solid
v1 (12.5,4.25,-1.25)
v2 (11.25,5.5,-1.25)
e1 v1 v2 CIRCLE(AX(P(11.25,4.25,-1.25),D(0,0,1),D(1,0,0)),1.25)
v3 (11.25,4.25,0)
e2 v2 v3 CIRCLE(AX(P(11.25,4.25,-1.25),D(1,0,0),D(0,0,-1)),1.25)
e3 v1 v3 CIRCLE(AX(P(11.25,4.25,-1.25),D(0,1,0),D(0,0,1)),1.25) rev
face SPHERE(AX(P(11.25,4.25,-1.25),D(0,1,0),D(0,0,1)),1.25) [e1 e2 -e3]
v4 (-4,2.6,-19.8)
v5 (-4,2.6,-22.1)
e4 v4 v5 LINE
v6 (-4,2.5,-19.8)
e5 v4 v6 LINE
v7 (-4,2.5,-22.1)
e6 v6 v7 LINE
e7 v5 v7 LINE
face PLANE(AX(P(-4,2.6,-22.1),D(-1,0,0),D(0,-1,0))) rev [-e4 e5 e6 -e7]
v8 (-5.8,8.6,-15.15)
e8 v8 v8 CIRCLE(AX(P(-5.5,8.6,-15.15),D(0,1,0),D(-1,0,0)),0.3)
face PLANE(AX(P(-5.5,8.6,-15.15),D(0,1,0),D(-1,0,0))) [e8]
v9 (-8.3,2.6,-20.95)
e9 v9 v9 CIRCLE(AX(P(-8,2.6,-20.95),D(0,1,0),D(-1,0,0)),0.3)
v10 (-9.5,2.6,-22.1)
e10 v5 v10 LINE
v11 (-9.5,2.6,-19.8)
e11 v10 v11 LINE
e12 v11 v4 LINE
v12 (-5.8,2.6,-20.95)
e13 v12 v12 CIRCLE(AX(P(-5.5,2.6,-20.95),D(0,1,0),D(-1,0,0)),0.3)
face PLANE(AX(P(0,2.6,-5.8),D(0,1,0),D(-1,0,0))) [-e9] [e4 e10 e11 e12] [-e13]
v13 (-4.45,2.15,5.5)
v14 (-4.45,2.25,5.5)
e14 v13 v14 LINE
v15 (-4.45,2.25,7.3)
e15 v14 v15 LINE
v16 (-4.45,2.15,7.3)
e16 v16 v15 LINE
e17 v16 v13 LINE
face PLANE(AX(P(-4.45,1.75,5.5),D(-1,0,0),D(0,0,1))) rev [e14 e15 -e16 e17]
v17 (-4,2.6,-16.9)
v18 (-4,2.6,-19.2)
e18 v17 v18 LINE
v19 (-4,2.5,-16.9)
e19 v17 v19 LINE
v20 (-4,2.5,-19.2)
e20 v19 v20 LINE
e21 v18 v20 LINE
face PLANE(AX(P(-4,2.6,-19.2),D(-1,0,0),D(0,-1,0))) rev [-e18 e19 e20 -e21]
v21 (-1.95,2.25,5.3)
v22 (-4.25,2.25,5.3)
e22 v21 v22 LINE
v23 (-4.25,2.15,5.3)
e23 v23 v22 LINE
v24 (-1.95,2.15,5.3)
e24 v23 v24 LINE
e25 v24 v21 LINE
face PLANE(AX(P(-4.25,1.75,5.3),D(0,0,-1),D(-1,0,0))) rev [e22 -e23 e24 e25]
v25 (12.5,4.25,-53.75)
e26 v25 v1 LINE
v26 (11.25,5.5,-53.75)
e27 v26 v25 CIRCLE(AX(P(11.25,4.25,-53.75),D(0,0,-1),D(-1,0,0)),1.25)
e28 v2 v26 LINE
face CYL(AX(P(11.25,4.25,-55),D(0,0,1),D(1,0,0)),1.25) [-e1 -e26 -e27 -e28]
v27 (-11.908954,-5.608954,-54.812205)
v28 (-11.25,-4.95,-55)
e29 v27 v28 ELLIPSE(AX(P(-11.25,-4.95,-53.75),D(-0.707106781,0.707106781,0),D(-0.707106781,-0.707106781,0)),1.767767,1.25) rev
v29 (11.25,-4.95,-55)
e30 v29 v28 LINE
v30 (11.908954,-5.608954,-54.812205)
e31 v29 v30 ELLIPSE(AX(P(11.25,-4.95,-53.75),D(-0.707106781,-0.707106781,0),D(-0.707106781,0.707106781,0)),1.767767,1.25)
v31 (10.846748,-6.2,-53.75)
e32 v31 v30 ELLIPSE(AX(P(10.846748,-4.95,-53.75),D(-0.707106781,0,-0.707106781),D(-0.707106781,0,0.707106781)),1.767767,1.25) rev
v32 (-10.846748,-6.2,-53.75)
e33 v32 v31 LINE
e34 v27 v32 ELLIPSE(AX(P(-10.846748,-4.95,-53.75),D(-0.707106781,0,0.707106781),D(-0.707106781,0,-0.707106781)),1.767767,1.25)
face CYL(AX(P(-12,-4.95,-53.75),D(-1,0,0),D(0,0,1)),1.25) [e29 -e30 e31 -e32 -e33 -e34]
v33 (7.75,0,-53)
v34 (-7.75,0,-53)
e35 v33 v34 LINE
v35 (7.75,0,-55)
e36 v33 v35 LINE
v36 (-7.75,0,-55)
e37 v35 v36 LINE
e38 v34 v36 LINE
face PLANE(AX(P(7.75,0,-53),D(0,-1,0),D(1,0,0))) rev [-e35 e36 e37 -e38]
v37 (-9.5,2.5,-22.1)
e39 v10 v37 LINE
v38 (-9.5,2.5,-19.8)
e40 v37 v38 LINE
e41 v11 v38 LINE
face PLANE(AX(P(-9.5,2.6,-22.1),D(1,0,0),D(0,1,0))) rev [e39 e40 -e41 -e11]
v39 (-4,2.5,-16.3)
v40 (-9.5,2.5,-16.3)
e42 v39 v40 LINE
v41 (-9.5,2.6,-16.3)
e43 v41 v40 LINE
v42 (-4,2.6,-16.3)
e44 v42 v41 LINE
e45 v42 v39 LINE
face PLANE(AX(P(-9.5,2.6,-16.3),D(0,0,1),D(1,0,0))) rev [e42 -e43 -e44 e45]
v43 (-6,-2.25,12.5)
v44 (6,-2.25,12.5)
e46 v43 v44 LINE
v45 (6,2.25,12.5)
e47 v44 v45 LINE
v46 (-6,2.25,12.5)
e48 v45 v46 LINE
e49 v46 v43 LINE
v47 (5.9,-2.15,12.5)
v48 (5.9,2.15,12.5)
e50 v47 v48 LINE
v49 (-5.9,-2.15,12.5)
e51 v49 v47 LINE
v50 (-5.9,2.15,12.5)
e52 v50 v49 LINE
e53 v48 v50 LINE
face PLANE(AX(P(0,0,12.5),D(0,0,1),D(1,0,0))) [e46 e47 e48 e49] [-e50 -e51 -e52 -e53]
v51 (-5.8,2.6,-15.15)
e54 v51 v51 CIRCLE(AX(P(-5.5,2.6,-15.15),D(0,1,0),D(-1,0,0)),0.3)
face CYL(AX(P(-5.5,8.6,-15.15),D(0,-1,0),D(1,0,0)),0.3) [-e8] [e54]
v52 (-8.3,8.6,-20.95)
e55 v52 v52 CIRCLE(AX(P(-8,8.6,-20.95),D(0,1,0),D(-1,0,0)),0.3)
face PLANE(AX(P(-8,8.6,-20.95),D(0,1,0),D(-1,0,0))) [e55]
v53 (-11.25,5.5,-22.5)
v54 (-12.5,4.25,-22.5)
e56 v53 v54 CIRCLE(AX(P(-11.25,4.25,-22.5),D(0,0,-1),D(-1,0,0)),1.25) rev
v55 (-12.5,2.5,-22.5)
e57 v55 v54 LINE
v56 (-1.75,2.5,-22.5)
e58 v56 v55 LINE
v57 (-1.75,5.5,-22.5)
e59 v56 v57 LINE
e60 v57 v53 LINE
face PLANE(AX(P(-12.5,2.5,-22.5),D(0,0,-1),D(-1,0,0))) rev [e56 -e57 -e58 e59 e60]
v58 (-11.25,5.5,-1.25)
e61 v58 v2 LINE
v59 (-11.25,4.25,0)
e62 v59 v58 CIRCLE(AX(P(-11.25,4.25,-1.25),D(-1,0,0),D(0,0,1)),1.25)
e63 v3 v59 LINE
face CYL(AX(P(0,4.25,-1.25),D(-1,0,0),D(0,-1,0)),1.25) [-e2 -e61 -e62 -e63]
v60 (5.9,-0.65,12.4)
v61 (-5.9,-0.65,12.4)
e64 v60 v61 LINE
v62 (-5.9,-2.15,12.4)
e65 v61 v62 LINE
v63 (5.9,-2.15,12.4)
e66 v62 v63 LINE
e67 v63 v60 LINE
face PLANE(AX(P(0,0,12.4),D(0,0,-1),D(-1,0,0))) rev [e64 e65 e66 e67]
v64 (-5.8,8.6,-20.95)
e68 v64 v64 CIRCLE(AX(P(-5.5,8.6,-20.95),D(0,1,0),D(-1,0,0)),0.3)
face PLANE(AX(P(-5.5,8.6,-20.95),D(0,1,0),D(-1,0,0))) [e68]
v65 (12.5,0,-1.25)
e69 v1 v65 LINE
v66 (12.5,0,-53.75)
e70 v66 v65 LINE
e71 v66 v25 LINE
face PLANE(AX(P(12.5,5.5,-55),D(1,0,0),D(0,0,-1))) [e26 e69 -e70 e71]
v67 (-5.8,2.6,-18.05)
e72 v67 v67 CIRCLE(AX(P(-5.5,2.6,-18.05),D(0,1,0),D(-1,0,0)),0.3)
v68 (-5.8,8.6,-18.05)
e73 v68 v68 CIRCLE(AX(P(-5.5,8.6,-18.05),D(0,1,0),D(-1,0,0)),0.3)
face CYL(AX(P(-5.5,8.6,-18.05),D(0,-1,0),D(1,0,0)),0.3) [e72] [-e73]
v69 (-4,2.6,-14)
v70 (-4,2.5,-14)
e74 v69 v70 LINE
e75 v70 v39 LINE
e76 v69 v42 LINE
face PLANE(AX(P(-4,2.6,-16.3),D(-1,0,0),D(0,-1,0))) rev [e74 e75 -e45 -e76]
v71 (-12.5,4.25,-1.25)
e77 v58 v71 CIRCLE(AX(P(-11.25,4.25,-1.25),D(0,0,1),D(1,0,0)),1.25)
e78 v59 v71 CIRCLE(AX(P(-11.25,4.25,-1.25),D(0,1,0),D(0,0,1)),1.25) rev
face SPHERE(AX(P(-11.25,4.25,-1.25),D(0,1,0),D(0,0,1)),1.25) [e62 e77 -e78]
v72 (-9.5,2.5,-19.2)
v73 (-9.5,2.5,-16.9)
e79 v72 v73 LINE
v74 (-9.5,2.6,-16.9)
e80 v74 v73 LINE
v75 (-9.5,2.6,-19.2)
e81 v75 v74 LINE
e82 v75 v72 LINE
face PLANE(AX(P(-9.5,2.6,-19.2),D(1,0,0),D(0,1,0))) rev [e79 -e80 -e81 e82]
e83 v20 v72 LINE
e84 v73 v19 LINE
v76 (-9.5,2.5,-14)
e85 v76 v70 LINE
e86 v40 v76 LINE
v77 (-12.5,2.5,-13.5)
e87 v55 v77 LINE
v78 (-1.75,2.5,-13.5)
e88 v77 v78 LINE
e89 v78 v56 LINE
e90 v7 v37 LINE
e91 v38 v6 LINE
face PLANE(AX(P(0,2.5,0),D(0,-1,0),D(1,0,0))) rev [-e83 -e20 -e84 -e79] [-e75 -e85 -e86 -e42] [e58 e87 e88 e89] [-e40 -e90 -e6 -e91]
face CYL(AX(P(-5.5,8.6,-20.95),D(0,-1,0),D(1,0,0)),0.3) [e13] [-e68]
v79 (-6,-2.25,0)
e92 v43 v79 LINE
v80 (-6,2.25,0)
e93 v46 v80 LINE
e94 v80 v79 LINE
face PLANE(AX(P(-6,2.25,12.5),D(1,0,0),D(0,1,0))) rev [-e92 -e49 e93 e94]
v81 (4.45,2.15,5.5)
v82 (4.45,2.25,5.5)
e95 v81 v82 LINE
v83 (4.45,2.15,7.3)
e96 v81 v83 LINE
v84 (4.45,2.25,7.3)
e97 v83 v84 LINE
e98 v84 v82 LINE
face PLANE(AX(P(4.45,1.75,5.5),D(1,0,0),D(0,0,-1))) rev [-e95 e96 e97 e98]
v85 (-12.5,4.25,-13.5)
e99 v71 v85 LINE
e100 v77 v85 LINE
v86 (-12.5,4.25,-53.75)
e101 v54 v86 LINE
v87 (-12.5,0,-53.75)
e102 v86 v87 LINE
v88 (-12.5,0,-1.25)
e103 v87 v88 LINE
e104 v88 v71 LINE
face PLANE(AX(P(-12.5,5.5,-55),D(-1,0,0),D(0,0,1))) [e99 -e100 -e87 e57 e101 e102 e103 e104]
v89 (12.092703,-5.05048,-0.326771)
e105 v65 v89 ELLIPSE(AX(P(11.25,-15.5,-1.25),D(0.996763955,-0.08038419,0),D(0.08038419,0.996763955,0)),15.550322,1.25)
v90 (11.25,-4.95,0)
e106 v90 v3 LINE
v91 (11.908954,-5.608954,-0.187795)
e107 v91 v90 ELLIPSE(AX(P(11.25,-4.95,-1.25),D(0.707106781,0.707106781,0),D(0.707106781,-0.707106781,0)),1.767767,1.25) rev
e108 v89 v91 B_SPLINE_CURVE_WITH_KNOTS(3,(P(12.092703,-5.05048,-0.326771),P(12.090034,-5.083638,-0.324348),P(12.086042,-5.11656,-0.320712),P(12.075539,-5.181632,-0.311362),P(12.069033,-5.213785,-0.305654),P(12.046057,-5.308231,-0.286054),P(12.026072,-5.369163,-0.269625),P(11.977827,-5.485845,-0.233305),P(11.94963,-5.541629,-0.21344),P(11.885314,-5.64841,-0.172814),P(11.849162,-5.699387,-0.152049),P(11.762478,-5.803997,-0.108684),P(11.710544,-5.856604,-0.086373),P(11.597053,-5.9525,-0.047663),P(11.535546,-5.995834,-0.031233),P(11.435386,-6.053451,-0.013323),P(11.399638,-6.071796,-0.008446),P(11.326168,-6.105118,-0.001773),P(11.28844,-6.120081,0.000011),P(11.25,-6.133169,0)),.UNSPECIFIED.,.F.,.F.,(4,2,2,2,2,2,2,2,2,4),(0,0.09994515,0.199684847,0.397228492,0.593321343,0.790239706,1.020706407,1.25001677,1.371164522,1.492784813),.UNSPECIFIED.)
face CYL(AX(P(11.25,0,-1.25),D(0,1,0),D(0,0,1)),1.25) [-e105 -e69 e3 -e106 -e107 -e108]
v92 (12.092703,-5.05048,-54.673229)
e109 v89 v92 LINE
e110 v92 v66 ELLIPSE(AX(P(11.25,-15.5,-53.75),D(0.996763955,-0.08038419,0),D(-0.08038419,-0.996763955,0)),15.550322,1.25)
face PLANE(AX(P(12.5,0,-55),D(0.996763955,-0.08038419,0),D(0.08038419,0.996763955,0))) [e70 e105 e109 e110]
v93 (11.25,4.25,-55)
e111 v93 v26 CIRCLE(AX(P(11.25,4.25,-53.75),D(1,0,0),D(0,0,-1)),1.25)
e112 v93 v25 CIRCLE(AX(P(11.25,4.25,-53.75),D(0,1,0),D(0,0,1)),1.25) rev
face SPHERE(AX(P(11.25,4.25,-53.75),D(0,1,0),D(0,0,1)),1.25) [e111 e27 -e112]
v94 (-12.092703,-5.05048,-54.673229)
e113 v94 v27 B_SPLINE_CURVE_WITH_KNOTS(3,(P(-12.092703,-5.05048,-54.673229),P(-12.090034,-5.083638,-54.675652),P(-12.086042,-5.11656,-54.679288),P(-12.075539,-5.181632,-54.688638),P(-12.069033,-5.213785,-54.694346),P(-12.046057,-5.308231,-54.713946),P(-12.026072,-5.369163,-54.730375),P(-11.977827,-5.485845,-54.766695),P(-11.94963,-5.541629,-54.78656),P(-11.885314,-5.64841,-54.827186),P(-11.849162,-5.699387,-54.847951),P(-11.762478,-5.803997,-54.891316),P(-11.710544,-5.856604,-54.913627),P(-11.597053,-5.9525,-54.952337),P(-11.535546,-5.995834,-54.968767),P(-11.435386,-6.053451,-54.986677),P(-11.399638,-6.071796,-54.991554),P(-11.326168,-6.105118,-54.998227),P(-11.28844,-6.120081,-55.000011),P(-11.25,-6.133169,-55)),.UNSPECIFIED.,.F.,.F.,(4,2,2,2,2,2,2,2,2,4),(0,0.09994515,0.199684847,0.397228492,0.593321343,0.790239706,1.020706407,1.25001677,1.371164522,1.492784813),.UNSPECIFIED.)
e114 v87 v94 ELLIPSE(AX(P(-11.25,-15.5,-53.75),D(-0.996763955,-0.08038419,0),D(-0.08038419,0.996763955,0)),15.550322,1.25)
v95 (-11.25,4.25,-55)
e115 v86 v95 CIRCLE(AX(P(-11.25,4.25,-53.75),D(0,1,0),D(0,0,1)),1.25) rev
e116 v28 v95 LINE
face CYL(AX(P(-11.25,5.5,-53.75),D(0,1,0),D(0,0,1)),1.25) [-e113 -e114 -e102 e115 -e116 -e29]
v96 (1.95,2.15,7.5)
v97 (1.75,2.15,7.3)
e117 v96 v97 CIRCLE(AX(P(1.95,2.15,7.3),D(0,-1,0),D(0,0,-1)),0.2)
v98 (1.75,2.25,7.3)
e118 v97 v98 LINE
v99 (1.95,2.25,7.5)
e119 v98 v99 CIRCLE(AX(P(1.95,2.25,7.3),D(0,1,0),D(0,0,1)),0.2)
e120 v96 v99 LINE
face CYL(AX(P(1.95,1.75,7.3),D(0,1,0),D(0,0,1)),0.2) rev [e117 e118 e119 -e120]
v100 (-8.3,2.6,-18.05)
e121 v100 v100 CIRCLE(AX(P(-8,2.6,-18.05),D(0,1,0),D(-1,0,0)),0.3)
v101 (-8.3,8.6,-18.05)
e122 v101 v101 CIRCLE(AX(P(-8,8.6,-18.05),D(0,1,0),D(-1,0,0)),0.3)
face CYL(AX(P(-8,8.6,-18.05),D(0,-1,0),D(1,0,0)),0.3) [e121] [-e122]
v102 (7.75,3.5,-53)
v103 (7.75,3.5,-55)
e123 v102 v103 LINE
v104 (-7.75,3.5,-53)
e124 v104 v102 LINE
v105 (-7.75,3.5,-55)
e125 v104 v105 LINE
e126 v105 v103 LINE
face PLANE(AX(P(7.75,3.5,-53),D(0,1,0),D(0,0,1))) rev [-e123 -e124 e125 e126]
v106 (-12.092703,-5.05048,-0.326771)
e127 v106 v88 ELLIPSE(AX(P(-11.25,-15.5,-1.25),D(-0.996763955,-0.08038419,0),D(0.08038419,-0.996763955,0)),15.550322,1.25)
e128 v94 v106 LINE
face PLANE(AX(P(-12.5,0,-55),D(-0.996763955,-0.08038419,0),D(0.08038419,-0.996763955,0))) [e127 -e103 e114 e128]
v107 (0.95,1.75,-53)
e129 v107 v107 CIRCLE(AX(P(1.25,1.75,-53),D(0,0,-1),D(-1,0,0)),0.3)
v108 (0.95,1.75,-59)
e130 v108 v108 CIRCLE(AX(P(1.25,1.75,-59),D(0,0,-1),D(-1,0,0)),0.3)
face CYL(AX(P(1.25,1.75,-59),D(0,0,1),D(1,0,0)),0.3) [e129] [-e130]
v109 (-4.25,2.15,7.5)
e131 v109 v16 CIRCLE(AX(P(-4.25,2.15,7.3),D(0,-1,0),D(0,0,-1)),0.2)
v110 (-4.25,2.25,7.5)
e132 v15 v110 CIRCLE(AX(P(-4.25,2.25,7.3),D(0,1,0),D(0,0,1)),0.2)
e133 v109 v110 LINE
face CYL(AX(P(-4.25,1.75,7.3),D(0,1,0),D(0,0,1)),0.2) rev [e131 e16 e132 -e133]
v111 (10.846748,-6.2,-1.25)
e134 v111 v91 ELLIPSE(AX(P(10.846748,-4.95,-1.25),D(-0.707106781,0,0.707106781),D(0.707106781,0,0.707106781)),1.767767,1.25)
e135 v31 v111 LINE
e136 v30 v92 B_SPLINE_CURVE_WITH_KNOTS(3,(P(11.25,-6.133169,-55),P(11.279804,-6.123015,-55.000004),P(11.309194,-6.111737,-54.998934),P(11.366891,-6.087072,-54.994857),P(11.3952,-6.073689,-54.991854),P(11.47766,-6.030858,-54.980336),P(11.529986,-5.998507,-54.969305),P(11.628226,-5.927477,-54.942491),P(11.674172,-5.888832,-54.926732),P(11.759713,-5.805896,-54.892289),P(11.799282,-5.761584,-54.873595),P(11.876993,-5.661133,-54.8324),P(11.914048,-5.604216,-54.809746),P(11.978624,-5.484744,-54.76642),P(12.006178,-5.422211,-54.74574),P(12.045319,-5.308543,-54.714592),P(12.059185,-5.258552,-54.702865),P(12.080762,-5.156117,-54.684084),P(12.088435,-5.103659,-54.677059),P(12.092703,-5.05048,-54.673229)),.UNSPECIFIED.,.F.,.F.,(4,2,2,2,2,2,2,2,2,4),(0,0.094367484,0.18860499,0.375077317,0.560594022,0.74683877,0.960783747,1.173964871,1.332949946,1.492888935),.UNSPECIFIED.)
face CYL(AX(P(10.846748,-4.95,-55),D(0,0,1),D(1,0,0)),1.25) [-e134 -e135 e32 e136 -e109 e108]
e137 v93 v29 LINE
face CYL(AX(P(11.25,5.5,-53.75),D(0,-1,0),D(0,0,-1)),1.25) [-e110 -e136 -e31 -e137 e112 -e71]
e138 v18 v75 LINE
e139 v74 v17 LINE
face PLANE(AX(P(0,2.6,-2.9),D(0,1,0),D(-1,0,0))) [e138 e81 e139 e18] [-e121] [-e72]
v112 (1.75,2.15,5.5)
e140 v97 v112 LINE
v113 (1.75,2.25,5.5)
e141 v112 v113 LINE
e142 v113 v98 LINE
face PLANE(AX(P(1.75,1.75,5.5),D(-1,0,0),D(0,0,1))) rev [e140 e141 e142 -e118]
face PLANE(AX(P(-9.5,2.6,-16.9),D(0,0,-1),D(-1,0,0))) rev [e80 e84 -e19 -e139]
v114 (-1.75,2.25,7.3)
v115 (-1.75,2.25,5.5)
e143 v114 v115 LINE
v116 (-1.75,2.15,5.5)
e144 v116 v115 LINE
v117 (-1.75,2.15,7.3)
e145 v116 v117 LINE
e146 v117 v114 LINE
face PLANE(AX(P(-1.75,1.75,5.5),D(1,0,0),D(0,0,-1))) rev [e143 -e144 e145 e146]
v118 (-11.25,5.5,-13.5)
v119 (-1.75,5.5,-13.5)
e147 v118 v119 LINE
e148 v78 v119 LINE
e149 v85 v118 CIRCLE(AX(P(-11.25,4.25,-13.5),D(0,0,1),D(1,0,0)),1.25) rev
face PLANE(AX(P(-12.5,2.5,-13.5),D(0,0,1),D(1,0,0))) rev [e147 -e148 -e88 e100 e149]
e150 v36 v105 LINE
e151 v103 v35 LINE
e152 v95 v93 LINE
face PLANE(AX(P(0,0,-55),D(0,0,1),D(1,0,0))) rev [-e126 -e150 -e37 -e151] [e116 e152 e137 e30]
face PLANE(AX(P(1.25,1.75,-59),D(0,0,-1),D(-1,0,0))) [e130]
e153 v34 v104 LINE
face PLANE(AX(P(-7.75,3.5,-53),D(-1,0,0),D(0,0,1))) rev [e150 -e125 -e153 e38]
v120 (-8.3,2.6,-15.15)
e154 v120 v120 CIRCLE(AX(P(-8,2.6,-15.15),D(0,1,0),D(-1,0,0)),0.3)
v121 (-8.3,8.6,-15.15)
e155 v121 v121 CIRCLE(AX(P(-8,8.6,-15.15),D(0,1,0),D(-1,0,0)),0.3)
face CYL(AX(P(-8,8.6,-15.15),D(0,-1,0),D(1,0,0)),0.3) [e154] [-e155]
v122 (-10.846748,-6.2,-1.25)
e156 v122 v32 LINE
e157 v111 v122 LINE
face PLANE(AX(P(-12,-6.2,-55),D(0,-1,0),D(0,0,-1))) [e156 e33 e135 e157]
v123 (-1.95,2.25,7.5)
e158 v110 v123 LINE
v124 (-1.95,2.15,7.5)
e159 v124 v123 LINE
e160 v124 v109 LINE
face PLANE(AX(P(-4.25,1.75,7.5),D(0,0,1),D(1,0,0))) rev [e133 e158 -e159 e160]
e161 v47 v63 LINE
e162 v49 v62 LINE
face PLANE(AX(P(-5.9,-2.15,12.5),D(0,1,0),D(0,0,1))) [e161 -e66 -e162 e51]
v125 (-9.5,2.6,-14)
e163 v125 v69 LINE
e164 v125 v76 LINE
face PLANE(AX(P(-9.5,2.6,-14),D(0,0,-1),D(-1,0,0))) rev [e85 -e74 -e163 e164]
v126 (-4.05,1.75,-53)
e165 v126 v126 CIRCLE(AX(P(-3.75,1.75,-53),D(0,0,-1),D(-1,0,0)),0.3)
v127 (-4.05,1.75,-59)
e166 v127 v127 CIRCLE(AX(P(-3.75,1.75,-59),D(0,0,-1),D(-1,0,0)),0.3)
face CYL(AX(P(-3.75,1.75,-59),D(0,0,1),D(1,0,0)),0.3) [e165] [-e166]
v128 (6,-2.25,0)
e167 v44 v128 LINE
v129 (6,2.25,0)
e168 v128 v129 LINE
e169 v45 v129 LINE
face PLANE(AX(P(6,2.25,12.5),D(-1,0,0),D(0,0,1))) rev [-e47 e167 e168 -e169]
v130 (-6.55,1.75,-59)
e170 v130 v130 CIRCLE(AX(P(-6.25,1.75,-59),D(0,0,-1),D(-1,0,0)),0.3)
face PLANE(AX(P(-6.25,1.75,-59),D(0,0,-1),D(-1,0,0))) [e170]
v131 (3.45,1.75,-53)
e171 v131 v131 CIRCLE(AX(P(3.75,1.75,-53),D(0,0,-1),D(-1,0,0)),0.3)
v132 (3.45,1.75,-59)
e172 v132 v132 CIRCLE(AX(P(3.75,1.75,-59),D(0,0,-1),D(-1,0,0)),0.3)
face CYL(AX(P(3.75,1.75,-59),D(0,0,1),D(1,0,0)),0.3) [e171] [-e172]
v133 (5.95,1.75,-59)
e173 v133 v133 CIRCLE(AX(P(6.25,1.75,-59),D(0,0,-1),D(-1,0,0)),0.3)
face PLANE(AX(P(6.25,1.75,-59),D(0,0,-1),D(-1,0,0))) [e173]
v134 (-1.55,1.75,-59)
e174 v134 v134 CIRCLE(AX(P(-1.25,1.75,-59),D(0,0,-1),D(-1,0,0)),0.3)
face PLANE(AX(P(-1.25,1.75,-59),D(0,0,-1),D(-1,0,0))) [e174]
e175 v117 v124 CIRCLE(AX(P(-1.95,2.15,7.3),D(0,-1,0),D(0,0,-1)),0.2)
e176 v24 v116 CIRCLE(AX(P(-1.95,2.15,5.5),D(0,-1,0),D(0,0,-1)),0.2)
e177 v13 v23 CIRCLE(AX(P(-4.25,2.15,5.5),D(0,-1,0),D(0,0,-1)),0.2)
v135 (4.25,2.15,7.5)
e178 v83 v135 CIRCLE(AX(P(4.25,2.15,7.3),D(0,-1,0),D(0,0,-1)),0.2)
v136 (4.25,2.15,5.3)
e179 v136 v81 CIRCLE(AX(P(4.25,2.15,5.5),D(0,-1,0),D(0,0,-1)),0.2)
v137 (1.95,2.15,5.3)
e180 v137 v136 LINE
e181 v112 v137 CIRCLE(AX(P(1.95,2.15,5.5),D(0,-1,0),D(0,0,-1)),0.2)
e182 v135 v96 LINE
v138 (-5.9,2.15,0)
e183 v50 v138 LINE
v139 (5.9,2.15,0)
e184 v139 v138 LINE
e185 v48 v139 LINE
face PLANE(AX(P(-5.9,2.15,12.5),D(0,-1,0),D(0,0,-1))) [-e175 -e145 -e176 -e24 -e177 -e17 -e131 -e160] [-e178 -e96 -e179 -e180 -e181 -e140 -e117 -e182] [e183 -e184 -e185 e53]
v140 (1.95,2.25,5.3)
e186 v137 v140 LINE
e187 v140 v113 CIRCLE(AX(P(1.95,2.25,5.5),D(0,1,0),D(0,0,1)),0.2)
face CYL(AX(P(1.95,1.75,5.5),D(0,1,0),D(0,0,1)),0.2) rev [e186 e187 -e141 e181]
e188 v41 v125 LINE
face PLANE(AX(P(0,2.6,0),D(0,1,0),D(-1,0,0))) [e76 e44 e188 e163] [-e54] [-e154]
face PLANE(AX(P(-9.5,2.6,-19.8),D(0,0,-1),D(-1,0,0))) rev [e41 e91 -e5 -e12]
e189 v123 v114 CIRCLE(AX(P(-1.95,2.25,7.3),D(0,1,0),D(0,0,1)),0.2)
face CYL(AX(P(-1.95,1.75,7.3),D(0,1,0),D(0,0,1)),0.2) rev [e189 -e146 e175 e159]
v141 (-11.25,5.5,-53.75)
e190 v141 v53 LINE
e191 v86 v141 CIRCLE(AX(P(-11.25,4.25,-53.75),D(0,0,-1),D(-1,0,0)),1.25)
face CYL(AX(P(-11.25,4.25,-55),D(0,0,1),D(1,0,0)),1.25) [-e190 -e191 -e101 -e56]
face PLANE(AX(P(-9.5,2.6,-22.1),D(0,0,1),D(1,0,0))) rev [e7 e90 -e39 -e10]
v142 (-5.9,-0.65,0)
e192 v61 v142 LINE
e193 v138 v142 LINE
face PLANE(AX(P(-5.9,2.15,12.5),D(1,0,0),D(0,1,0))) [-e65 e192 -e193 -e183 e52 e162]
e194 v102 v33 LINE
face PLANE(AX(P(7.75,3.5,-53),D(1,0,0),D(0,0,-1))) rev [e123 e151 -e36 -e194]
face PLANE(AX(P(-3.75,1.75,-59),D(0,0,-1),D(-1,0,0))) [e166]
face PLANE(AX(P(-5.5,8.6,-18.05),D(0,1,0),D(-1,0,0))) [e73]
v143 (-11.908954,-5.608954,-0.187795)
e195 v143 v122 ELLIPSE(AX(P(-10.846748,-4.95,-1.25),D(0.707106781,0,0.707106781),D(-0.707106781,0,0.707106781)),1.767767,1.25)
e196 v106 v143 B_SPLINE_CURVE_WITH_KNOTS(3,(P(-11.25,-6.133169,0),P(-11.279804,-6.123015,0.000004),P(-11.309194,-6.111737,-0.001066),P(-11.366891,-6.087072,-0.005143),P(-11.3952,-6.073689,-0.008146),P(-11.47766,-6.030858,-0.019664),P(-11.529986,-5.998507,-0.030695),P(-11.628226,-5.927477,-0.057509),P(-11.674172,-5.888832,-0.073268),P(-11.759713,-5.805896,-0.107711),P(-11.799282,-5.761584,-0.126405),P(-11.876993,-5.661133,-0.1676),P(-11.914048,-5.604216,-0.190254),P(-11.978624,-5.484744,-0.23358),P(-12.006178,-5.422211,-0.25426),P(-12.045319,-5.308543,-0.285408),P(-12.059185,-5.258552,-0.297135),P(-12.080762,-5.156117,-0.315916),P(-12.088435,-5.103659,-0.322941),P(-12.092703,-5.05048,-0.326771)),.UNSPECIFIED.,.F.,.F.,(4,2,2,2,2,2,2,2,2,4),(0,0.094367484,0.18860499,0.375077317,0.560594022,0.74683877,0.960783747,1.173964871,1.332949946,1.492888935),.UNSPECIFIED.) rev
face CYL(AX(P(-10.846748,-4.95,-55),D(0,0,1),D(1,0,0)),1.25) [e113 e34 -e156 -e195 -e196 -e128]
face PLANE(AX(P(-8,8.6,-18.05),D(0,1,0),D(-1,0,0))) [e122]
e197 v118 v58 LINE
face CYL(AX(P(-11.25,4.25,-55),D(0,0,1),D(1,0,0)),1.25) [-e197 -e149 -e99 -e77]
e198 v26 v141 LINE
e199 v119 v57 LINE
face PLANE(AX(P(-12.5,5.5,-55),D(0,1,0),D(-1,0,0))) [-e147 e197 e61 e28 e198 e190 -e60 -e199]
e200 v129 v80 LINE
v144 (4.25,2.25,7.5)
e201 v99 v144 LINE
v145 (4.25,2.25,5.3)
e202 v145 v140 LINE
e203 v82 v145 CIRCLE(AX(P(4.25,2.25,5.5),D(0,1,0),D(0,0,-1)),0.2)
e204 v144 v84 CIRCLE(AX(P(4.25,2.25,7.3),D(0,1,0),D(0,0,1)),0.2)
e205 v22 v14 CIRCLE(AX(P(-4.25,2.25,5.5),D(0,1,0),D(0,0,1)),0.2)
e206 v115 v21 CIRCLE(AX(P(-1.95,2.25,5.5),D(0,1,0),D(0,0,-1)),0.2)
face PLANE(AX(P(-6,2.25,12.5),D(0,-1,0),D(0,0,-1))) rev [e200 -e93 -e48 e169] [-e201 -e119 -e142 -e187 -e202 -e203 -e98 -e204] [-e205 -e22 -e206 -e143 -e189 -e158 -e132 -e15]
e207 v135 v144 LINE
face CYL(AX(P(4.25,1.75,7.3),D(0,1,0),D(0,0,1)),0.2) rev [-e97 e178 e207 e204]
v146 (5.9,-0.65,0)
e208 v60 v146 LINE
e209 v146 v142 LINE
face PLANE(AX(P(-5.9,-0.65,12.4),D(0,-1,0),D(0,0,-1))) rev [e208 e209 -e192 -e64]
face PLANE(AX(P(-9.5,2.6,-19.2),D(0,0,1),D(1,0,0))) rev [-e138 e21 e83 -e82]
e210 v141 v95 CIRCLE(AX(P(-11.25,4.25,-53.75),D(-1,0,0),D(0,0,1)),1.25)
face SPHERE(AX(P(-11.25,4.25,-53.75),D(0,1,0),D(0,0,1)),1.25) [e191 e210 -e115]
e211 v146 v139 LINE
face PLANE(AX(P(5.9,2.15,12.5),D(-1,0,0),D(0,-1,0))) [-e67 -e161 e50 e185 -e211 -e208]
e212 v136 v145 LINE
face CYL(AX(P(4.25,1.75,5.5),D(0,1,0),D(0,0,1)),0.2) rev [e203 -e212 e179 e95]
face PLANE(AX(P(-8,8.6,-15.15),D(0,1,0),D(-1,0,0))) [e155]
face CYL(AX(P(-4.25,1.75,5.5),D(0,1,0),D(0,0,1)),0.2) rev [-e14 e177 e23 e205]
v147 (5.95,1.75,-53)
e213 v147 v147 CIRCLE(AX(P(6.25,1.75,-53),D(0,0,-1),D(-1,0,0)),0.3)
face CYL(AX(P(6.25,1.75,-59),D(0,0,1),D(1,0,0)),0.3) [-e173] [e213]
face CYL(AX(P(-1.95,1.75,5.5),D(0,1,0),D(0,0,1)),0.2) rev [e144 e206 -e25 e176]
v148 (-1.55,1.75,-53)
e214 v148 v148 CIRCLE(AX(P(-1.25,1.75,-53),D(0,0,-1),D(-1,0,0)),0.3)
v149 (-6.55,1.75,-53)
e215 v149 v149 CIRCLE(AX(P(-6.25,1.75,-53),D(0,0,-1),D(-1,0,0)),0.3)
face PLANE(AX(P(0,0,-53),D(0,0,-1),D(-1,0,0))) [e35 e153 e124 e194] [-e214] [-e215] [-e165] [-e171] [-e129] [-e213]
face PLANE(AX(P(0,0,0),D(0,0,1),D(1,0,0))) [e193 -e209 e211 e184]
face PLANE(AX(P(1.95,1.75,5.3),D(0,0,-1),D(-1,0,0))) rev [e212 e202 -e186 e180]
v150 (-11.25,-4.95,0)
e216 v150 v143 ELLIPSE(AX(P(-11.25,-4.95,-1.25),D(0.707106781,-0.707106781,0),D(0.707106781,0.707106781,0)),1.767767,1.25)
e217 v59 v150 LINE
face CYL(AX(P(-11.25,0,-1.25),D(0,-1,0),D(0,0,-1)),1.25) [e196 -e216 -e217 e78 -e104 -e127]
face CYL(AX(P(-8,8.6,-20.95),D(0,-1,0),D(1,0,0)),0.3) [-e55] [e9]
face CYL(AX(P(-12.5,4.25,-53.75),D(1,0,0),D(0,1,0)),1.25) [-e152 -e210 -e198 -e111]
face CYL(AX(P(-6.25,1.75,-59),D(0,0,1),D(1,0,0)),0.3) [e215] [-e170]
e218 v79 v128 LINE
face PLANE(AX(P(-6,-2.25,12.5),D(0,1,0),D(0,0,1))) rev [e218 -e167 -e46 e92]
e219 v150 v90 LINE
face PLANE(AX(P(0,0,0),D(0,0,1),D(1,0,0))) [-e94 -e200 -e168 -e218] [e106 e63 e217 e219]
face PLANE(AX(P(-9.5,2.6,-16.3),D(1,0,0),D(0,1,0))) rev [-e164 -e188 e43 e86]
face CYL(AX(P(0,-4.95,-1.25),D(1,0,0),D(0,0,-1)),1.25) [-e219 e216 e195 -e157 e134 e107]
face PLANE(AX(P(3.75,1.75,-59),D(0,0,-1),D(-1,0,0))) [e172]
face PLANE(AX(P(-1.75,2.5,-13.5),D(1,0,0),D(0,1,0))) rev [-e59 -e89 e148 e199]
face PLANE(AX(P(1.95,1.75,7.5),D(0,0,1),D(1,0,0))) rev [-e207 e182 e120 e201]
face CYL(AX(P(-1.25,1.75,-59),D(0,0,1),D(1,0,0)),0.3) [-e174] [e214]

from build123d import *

# Parameters (mm, degrees)
BOSS_EXTRUDE1_DEPTH = 55
SKETCH2_W           = 12
SKETCH2_H           = 4.5
SKETCH2_W_2         = 11.8
SKETCH2_H_2         = 4.3
BOSS_EXTRUDE2_DEPTH = 12.5
SKETCH3_W           = 11.8
SKETCH3_H           = 1.5
BOSS_EXTRUDE3_DEPTH = 12.4
CUT_EXTRUDE1_DEPTH  = 0.5
SKETCH6_W           = 10.75
SKETCH6_H           = 9
CUT_EXTRUDE2_DEPTH  = 3
SKETCH7_W           = 5.5
SKETCH7_H           = 2.3
BOSS_EXTRUDE4_DEPTH = 0.1
SKETCH8_R           = 0.3
BOSS_EXTRUDE5_DEPTH = 6
LPATTERN1_COUNT     = 3
LPATTERN1_PITCH     = 2.9
SKETCH9_W           = 15.5
SKETCH9_H           = 3.5
CUT_EXTRUDE3_DEPTH  = 2
SKETCH10_R          = 0.3
BOSS_EXTRUDE6_DEPTH = 6
LPATTERN2_COUNT     = 6
LPATTERN2_PITCH     = 2.5
FILLET1_R           = 1.25


with BuildPart() as part:
    # Sketch1 → Boss-Extrude1 (new body)
    with BuildSketch(Plane.XY):
        Polygon((-12.5, 0), (-12, -6.2), (12, -6.2), (12.5, 0), (12.5, 5.5), (-12.5, 5.5), align=None)
    extrude(amount=-BOSS_EXTRUDE1_DEPTH)

    # Sketch2 → Boss-Extrude2 (add)
    with BuildSketch(Plane.XY):
        Rectangle(SKETCH2_W, SKETCH2_H)
        Rectangle(SKETCH2_W_2, SKETCH2_H_2, mode=Mode.SUBTRACT)
    extrude(amount=BOSS_EXTRUDE2_DEPTH)

    # Sketch3 → Boss-Extrude3 (add)
    with BuildSketch(Plane.XY):
        with Locations((0, -1.4)):
            Rectangle(SKETCH3_W, SKETCH3_H)
    extrude(amount=BOSS_EXTRUDE3_DEPTH)

    # Sketch4 → Cut-Extrude1 (cut)
    with BuildSketch(Plane(origin=(0, 2.25, 0), x_dir=(1, 0, 0), z_dir=(0, 1, 0))):
        with BuildLine():
            Line((-4.25, -5.3), (-1.95, -5.3))
            ThreePointArc((-1.95, -5.3), (-1.808578644, -5.358578644), (-1.75, -5.5))
            Line((-1.75, -5.5), (-1.75, -7.3))
            ThreePointArc((-1.75, -7.3), (-1.808578644, -7.441421356), (-1.95, -7.5))
            Line((-1.95, -7.5), (-4.25, -7.5))
            ThreePointArc((-4.25, -7.5), (-4.391421356, -7.441421356), (-4.45, -7.3))
            Line((-4.45, -7.3), (-4.45, -5.5))
            ThreePointArc((-4.45, -5.5), (-4.391421356, -5.358578644), (-4.25, -5.3))
        make_face()
        with BuildLine():
            Line((1.95, -5.3), (4.25, -5.3))
            ThreePointArc((4.25, -5.3), (4.391421356, -5.358578644), (4.45, -5.5))
            Line((4.45, -5.5), (4.45, -7.3))
            ThreePointArc((4.45, -7.3), (4.391421356, -7.441421356), (4.25, -7.5))
            Line((4.25, -7.5), (1.95, -7.5))
            ThreePointArc((1.95, -7.5), (1.808578644, -7.441421356), (1.75, -7.3))
            Line((1.75, -7.3), (1.75, -5.5))
            ThreePointArc((1.75, -5.5), (1.808578644, -5.358578644), (1.95, -5.3))
        make_face()
    extrude(amount=-CUT_EXTRUDE1_DEPTH, mode=Mode.SUBTRACT)

    # Sketch6 → Cut-Extrude2 (cut)
    with BuildSketch(Plane(origin=(0, 5.5, 0), x_dir=(1, 0, 0), z_dir=(0, 1, 0))):
        with Locations((-7.125, 18)):
            Rectangle(SKETCH6_W, SKETCH6_H)
    extrude(amount=-CUT_EXTRUDE2_DEPTH, mode=Mode.SUBTRACT)

    # Sketch7 → Boss-Extrude4 (add)
    with BuildSketch(Plane(origin=(0, 2.5, 0), x_dir=(1, 0, 0), z_dir=(0, 1, 0))):
        with Locations((-6.75, 15.15)):
            Rectangle(SKETCH7_W, SKETCH7_H)
    boss_extrude4 = extrude(amount=BOSS_EXTRUDE4_DEPTH)

    # Sketch8 → Boss-Extrude5 (add)
    with BuildSketch(Plane(origin=(0, 2.6, 0), x_dir=(1, 0, 0), z_dir=(0, 1, 0))):
        with Locations(Location((-8, 15.15, 0), (0, 0, 180))):
            Circle(SKETCH8_R)
        with Locations(Location((-5.5, 15.15, 0), (0, 0, 180))):
            Circle(SKETCH8_R)
    boss_extrude5 = extrude(amount=BOSS_EXTRUDE5_DEPTH)

    # LPattern1: Boss-Extrude4, Boss-Extrude5 ×3
    with Locations(*[(0, 0, -i * LPATTERN1_PITCH) for i in range(1, LPATTERN1_COUNT)]):
        add(boss_extrude4)
        add(boss_extrude5)

    # Sketch9 → Cut-Extrude3 (cut)
    with BuildSketch(Plane(origin=(0, 0, -55), x_dir=(-1, 0, 0), z_dir=(0, 0, -1))):
        with Locations((0, 1.75)):
            Rectangle(SKETCH9_W, SKETCH9_H)
    extrude(amount=-CUT_EXTRUDE3_DEPTH, mode=Mode.SUBTRACT)

    # Sketch10 → Boss-Extrude6 (add)
    with BuildSketch(Plane(origin=(0, 0, -53), x_dir=(-1, 0, 0), z_dir=(0, 0, -1))):
        with Locations((-6.25, 1.75)):
            Circle(SKETCH10_R)
    boss_extrude6 = extrude(amount=BOSS_EXTRUDE6_DEPTH)

    # LPattern2: Boss-Extrude6 ×6
    with Locations(*[(-i * LPATTERN2_PITCH, 0, 0) for i in range(1, LPATTERN2_COUNT)]):
        add(boss_extrude6)

    # Fillet1
    # the kernel refuses this fillet: 1.25 mm, written as the material it takes off along each edge
    with BuildSketch(Plane(origin=(11.25, 4.25, -1.25), x_dir=(0, 0, 1), z_dir=(1, 0, 0))) as fillet1_piece_1_section:
        Polygon((0, 0), (FILLET1_R * 1.02, 0), (FILLET1_R * 1.02, -FILLET1_R * 1.02), (0, -FILLET1_R * 1.02), align=None)
    fillet1_piece_1 = extrude(amount=FILLET1_R * 1.02, mode=Mode.PRIVATE)
    fillet1_piece_1 = fillet1_piece_1 - Plane(origin=(11.25, 4.25, -1.25), x_dir=(0, -0.7071067811865475, -0.7071067811865475), z_dir=(1, 0, 0)) * Sphere(FILLET1_R, mode=Mode.PRIVATE)
    add(fillet1_piece_1, mode=Mode.SUBTRACT)
    with BuildSketch(Plane(origin=(-11.25, 4.25, -1.25), x_dir=(0, 0, 1), z_dir=(-1, 0, 0))) as fillet1_piece_2_section:
        Polygon((0, 0), (FILLET1_R * 1.02, 0), (FILLET1_R * 1.02, FILLET1_R * 1.02), (0, FILLET1_R * 1.02), align=None)
    fillet1_piece_2 = extrude(amount=FILLET1_R * 1.02, mode=Mode.PRIVATE)
    fillet1_piece_2 = fillet1_piece_2 - Plane(origin=(-11.25, 4.25, -1.25), x_dir=(0, -0.7071067811865475, -0.7071067811865475), z_dir=(-1, 0, 0)) * Sphere(FILLET1_R, mode=Mode.PRIVATE)
    add(fillet1_piece_2, mode=Mode.SUBTRACT)
    with BuildSketch(Plane(origin=(-11.25, 4.25, -53.75), x_dir=(0, 0, -1), z_dir=(-1, 0, 0))) as fillet1_piece_3_section:
        Polygon((0, 0), (FILLET1_R * 1.02, 0), (FILLET1_R * 1.02, -FILLET1_R * 1.02), (0, -FILLET1_R * 1.02), align=None)
    fillet1_piece_3 = extrude(amount=FILLET1_R * 1.02, mode=Mode.PRIVATE)
    fillet1_piece_3 = fillet1_piece_3 - Plane(origin=(-11.25, 4.25, -53.75), x_dir=(0, -0.7071067811865475, 0.7071067811865475), z_dir=(-1, 0, 0)) * Sphere(FILLET1_R, mode=Mode.PRIVATE)
    add(fillet1_piece_3, mode=Mode.SUBTRACT)
    with BuildSketch(Plane(origin=(11.25, 4.25, -53.75), x_dir=(0, 0, -1), z_dir=(1, 0, 0))) as fillet1_piece_4_section:
        Polygon((0, 0), (FILLET1_R * 1.02, 0), (FILLET1_R * 1.02, FILLET1_R * 1.02), (0, FILLET1_R * 1.02), align=None)
    fillet1_piece_4 = extrude(amount=FILLET1_R * 1.02, mode=Mode.PRIVATE)
    fillet1_piece_4 = fillet1_piece_4 - Plane(origin=(11.25, 4.25, -53.75), x_dir=(0, -0.7071067811865475, 0.7071067811865475), z_dir=(1, 0, 0)) * Sphere(FILLET1_R, mode=Mode.PRIVATE)
    add(fillet1_piece_4, mode=Mode.SUBTRACT)
    with BuildSketch(Plane(origin=(-19.5, -6.2, 0), x_dir=(0, 0, -1), z_dir=(1, 0, 0))) as fillet1_piece_5:
        with BuildLine():
            CenterArc((FILLET1_R, FILLET1_R), FILLET1_R, 180, 90)
            Line((0, FILLET1_R), (-FILLET1_R * 0.02, FILLET1_R))
            Line((-FILLET1_R * 0.02, FILLET1_R), (-FILLET1_R * 0.02, -FILLET1_R * 0.02))
            Line((-FILLET1_R * 0.02, -FILLET1_R * 0.02), (FILLET1_R, -FILLET1_R * 0.02))
            Line((FILLET1_R, -FILLET1_R * 0.02), (FILLET1_R, 0))
        make_face()
    extrude(amount=39, mode=Mode.SUBTRACT)
    with BuildSketch(Plane(origin=(11.25, 5.5, 0), x_dir=(0, -1, 0), z_dir=(-1, 0, 0))) as fillet1_piece_6:
        with BuildLine():
            CenterArc((FILLET1_R, -FILLET1_R), FILLET1_R, 90, 90)
            Line((0, -FILLET1_R), (-FILLET1_R * 0.02, -FILLET1_R))
            Line((-FILLET1_R * 0.02, -FILLET1_R), (-FILLET1_R * 0.02, FILLET1_R * 0.02))
            Line((-FILLET1_R * 0.02, FILLET1_R * 0.02), (FILLET1_R, FILLET1_R * 0.02))
            Line((FILLET1_R, FILLET1_R * 0.02), (FILLET1_R, 0))
        make_face()
    extrude(amount=22.5, mode=Mode.SUBTRACT)
    with BuildSketch(Plane(origin=(-12.5, 5.5, -1.25), x_dir=(0, -1, 0), z_dir=(0, 0, -1))) as fillet1_piece_7:
        with BuildLine():
            CenterArc((FILLET1_R, -FILLET1_R), FILLET1_R, 90, 90)
            Line((0, -FILLET1_R), (-FILLET1_R * 0.02, -FILLET1_R))
            Line((-FILLET1_R * 0.02, -FILLET1_R), (-FILLET1_R * 0.02, FILLET1_R * 0.02))
            Line((-FILLET1_R * 0.02, FILLET1_R * 0.02), (FILLET1_R, FILLET1_R * 0.02))
            Line((FILLET1_R, FILLET1_R * 0.02), (FILLET1_R, 0))
        make_face()
    extrude(amount=19.75, mode=Mode.SUBTRACT)
    with BuildSketch(Plane(origin=(-12.5, 5.5, -15), x_dir=(0, -1, 0), z_dir=(0, 0, -1))) as fillet1_piece_8:
        with BuildLine():
            CenterArc((FILLET1_R, -FILLET1_R), FILLET1_R, 90, 90)
            Line((0, -FILLET1_R), (-FILLET1_R * 0.02, -FILLET1_R))
            Line((-FILLET1_R * 0.02, -FILLET1_R), (-FILLET1_R * 0.02, FILLET1_R * 0.02))
            Line((-FILLET1_R * 0.02, FILLET1_R * 0.02), (FILLET1_R, FILLET1_R * 0.02))
            Line((FILLET1_R, FILLET1_R * 0.02), (FILLET1_R, 0))
        make_face()
    extrude(amount=38.75, mode=Mode.SUBTRACT)
    with BuildSketch(Plane(origin=(-12, -6.2, 6.919510423), x_dir=(-0.08038418992031013, 0.9967639550118451, 0), z_dir=(0, 0, -1)), Plane(origin=(12, -6.2, 6.919510423), x_dir=(-1, 0, 0), z_dir=(0, 0, -1))) as fillet1_piece_9:
        with BuildLine():
            CenterArc((FILLET1_R * 0.922601389683, FILLET1_R), FILLET1_R, 184.610649319, 85.389350681)
            Line((-FILLET1_R * 0.074162565329, FILLET1_R * 0.91961581008), (-FILLET1_R * 0.0940978444292, FILLET1_R * 0.918008126281))
            Line((-FILLET1_R * 0.0940978444292, FILLET1_R * 0.918008126281), (-FILLET1_R * 0.0184520277937, -FILLET1_R * 0.02))
            Line((-FILLET1_R * 0.0184520277937, -FILLET1_R * 0.02), (FILLET1_R * 0.922601389683, -FILLET1_R * 0.02))
            Line((FILLET1_R * 0.922601389683, -FILLET1_R * 0.02), (FILLET1_R * 0.922601389683, 0))
        make_face()
    extrude(amount=68.839020845, mode=Mode.SUBTRACT)
    with BuildSketch(Plane(origin=(-19.5, -6.2, -55), x_dir=(0, 0, 1), z_dir=(1, 0, 0))) as fillet1_piece_10:
        with BuildLine():
            CenterArc((FILLET1_R, -FILLET1_R), FILLET1_R, 90, 90)
            Line((0, -FILLET1_R), (-FILLET1_R * 0.02, -FILLET1_R))
            Line((-FILLET1_R * 0.02, -FILLET1_R), (-FILLET1_R * 0.02, FILLET1_R * 0.02))
            Line((-FILLET1_R * 0.02, FILLET1_R * 0.02), (FILLET1_R, FILLET1_R * 0.02))
            Line((FILLET1_R, FILLET1_R * 0.02), (FILLET1_R, 0))
        make_face()
    extrude(amount=39, mode=Mode.SUBTRACT)
    with BuildSketch(Plane(origin=(11.25, 5.5, -55), x_dir=(0, -1, 0), z_dir=(-1, 0, 0))) as fillet1_piece_11:
        with BuildLine():
            CenterArc((FILLET1_R, FILLET1_R), FILLET1_R, 180, 90)
            Line((0, FILLET1_R), (-FILLET1_R * 0.02, FILLET1_R))
            Line((-FILLET1_R * 0.02, FILLET1_R), (-FILLET1_R * 0.02, -FILLET1_R * 0.02))
            Line((-FILLET1_R * 0.02, -FILLET1_R * 0.02), (FILLET1_R, -FILLET1_R * 0.02))
            Line((FILLET1_R, -FILLET1_R * 0.02), (FILLET1_R, 0))
        make_face()
    extrude(amount=22.5, mode=Mode.SUBTRACT)
    with BuildSketch(Plane(origin=(12.5, 5.5, -1.25), x_dir=(-1, 0, 0), z_dir=(0, 0, -1))) as fillet1_piece_12:
        with BuildLine():
            CenterArc((FILLET1_R, -FILLET1_R), FILLET1_R, 90, 90)
            Line((0, -FILLET1_R), (-FILLET1_R * 0.02, -FILLET1_R))
            Line((-FILLET1_R * 0.02, -FILLET1_R), (-FILLET1_R * 0.02, FILLET1_R * 0.02))
            Line((-FILLET1_R * 0.02, FILLET1_R * 0.02), (FILLET1_R, FILLET1_R * 0.02))
            Line((FILLET1_R, FILLET1_R * 0.02), (FILLET1_R, 0))
        make_face()
    extrude(amount=52.5, mode=Mode.SUBTRACT)
    with BuildSketch(Plane(origin=(12.5, -7.5, -55), x_dir=(-1, 0, 0), z_dir=(0, 1, 0)), Plane(origin=(-12.5, 4.25, 0), x_dir=(0, 0, -1), z_dir=(0, -1, 0))) as fillet1_piece_13:
        with BuildLine():
            CenterArc((FILLET1_R, FILLET1_R), FILLET1_R, 180, 90)
            Line((0, FILLET1_R), (-FILLET1_R * 0.02, FILLET1_R))
            Line((-FILLET1_R * 0.02, FILLET1_R), (-FILLET1_R * 0.02, -FILLET1_R * 0.02))
            Line((-FILLET1_R * 0.02, -FILLET1_R * 0.02), (FILLET1_R, -FILLET1_R * 0.02))
            Line((FILLET1_R, -FILLET1_R * 0.02), (FILLET1_R, 0))
        make_face()
    extrude(amount=11.75, mode=Mode.SUBTRACT)
    with BuildSketch(Plane(origin=(-12.5, 4.25, -55), x_dir=(0, 0, 1), z_dir=(0, -1, 0)), Plane(origin=(12.5, -7.5, 0), x_dir=(-1, 0, 0), z_dir=(0, 1, 0))) as fillet1_piece_14:
        with BuildLine():
            CenterArc((FILLET1_R, -FILLET1_R), FILLET1_R, 90, 90)
            Line((0, -FILLET1_R), (-FILLET1_R * 0.02, -FILLET1_R))
            Line((-FILLET1_R * 0.02, -FILLET1_R), (-FILLET1_R * 0.02, FILLET1_R * 0.02))
            Line((-FILLET1_R * 0.02, FILLET1_R * 0.02), (FILLET1_R, FILLET1_R * 0.02))
            Line((FILLET1_R, FILLET1_R * 0.02), (FILLET1_R, 0))
        make_face()
    extrude(amount=11.75, mode=Mode.SUBTRACT)


solid = part.part
